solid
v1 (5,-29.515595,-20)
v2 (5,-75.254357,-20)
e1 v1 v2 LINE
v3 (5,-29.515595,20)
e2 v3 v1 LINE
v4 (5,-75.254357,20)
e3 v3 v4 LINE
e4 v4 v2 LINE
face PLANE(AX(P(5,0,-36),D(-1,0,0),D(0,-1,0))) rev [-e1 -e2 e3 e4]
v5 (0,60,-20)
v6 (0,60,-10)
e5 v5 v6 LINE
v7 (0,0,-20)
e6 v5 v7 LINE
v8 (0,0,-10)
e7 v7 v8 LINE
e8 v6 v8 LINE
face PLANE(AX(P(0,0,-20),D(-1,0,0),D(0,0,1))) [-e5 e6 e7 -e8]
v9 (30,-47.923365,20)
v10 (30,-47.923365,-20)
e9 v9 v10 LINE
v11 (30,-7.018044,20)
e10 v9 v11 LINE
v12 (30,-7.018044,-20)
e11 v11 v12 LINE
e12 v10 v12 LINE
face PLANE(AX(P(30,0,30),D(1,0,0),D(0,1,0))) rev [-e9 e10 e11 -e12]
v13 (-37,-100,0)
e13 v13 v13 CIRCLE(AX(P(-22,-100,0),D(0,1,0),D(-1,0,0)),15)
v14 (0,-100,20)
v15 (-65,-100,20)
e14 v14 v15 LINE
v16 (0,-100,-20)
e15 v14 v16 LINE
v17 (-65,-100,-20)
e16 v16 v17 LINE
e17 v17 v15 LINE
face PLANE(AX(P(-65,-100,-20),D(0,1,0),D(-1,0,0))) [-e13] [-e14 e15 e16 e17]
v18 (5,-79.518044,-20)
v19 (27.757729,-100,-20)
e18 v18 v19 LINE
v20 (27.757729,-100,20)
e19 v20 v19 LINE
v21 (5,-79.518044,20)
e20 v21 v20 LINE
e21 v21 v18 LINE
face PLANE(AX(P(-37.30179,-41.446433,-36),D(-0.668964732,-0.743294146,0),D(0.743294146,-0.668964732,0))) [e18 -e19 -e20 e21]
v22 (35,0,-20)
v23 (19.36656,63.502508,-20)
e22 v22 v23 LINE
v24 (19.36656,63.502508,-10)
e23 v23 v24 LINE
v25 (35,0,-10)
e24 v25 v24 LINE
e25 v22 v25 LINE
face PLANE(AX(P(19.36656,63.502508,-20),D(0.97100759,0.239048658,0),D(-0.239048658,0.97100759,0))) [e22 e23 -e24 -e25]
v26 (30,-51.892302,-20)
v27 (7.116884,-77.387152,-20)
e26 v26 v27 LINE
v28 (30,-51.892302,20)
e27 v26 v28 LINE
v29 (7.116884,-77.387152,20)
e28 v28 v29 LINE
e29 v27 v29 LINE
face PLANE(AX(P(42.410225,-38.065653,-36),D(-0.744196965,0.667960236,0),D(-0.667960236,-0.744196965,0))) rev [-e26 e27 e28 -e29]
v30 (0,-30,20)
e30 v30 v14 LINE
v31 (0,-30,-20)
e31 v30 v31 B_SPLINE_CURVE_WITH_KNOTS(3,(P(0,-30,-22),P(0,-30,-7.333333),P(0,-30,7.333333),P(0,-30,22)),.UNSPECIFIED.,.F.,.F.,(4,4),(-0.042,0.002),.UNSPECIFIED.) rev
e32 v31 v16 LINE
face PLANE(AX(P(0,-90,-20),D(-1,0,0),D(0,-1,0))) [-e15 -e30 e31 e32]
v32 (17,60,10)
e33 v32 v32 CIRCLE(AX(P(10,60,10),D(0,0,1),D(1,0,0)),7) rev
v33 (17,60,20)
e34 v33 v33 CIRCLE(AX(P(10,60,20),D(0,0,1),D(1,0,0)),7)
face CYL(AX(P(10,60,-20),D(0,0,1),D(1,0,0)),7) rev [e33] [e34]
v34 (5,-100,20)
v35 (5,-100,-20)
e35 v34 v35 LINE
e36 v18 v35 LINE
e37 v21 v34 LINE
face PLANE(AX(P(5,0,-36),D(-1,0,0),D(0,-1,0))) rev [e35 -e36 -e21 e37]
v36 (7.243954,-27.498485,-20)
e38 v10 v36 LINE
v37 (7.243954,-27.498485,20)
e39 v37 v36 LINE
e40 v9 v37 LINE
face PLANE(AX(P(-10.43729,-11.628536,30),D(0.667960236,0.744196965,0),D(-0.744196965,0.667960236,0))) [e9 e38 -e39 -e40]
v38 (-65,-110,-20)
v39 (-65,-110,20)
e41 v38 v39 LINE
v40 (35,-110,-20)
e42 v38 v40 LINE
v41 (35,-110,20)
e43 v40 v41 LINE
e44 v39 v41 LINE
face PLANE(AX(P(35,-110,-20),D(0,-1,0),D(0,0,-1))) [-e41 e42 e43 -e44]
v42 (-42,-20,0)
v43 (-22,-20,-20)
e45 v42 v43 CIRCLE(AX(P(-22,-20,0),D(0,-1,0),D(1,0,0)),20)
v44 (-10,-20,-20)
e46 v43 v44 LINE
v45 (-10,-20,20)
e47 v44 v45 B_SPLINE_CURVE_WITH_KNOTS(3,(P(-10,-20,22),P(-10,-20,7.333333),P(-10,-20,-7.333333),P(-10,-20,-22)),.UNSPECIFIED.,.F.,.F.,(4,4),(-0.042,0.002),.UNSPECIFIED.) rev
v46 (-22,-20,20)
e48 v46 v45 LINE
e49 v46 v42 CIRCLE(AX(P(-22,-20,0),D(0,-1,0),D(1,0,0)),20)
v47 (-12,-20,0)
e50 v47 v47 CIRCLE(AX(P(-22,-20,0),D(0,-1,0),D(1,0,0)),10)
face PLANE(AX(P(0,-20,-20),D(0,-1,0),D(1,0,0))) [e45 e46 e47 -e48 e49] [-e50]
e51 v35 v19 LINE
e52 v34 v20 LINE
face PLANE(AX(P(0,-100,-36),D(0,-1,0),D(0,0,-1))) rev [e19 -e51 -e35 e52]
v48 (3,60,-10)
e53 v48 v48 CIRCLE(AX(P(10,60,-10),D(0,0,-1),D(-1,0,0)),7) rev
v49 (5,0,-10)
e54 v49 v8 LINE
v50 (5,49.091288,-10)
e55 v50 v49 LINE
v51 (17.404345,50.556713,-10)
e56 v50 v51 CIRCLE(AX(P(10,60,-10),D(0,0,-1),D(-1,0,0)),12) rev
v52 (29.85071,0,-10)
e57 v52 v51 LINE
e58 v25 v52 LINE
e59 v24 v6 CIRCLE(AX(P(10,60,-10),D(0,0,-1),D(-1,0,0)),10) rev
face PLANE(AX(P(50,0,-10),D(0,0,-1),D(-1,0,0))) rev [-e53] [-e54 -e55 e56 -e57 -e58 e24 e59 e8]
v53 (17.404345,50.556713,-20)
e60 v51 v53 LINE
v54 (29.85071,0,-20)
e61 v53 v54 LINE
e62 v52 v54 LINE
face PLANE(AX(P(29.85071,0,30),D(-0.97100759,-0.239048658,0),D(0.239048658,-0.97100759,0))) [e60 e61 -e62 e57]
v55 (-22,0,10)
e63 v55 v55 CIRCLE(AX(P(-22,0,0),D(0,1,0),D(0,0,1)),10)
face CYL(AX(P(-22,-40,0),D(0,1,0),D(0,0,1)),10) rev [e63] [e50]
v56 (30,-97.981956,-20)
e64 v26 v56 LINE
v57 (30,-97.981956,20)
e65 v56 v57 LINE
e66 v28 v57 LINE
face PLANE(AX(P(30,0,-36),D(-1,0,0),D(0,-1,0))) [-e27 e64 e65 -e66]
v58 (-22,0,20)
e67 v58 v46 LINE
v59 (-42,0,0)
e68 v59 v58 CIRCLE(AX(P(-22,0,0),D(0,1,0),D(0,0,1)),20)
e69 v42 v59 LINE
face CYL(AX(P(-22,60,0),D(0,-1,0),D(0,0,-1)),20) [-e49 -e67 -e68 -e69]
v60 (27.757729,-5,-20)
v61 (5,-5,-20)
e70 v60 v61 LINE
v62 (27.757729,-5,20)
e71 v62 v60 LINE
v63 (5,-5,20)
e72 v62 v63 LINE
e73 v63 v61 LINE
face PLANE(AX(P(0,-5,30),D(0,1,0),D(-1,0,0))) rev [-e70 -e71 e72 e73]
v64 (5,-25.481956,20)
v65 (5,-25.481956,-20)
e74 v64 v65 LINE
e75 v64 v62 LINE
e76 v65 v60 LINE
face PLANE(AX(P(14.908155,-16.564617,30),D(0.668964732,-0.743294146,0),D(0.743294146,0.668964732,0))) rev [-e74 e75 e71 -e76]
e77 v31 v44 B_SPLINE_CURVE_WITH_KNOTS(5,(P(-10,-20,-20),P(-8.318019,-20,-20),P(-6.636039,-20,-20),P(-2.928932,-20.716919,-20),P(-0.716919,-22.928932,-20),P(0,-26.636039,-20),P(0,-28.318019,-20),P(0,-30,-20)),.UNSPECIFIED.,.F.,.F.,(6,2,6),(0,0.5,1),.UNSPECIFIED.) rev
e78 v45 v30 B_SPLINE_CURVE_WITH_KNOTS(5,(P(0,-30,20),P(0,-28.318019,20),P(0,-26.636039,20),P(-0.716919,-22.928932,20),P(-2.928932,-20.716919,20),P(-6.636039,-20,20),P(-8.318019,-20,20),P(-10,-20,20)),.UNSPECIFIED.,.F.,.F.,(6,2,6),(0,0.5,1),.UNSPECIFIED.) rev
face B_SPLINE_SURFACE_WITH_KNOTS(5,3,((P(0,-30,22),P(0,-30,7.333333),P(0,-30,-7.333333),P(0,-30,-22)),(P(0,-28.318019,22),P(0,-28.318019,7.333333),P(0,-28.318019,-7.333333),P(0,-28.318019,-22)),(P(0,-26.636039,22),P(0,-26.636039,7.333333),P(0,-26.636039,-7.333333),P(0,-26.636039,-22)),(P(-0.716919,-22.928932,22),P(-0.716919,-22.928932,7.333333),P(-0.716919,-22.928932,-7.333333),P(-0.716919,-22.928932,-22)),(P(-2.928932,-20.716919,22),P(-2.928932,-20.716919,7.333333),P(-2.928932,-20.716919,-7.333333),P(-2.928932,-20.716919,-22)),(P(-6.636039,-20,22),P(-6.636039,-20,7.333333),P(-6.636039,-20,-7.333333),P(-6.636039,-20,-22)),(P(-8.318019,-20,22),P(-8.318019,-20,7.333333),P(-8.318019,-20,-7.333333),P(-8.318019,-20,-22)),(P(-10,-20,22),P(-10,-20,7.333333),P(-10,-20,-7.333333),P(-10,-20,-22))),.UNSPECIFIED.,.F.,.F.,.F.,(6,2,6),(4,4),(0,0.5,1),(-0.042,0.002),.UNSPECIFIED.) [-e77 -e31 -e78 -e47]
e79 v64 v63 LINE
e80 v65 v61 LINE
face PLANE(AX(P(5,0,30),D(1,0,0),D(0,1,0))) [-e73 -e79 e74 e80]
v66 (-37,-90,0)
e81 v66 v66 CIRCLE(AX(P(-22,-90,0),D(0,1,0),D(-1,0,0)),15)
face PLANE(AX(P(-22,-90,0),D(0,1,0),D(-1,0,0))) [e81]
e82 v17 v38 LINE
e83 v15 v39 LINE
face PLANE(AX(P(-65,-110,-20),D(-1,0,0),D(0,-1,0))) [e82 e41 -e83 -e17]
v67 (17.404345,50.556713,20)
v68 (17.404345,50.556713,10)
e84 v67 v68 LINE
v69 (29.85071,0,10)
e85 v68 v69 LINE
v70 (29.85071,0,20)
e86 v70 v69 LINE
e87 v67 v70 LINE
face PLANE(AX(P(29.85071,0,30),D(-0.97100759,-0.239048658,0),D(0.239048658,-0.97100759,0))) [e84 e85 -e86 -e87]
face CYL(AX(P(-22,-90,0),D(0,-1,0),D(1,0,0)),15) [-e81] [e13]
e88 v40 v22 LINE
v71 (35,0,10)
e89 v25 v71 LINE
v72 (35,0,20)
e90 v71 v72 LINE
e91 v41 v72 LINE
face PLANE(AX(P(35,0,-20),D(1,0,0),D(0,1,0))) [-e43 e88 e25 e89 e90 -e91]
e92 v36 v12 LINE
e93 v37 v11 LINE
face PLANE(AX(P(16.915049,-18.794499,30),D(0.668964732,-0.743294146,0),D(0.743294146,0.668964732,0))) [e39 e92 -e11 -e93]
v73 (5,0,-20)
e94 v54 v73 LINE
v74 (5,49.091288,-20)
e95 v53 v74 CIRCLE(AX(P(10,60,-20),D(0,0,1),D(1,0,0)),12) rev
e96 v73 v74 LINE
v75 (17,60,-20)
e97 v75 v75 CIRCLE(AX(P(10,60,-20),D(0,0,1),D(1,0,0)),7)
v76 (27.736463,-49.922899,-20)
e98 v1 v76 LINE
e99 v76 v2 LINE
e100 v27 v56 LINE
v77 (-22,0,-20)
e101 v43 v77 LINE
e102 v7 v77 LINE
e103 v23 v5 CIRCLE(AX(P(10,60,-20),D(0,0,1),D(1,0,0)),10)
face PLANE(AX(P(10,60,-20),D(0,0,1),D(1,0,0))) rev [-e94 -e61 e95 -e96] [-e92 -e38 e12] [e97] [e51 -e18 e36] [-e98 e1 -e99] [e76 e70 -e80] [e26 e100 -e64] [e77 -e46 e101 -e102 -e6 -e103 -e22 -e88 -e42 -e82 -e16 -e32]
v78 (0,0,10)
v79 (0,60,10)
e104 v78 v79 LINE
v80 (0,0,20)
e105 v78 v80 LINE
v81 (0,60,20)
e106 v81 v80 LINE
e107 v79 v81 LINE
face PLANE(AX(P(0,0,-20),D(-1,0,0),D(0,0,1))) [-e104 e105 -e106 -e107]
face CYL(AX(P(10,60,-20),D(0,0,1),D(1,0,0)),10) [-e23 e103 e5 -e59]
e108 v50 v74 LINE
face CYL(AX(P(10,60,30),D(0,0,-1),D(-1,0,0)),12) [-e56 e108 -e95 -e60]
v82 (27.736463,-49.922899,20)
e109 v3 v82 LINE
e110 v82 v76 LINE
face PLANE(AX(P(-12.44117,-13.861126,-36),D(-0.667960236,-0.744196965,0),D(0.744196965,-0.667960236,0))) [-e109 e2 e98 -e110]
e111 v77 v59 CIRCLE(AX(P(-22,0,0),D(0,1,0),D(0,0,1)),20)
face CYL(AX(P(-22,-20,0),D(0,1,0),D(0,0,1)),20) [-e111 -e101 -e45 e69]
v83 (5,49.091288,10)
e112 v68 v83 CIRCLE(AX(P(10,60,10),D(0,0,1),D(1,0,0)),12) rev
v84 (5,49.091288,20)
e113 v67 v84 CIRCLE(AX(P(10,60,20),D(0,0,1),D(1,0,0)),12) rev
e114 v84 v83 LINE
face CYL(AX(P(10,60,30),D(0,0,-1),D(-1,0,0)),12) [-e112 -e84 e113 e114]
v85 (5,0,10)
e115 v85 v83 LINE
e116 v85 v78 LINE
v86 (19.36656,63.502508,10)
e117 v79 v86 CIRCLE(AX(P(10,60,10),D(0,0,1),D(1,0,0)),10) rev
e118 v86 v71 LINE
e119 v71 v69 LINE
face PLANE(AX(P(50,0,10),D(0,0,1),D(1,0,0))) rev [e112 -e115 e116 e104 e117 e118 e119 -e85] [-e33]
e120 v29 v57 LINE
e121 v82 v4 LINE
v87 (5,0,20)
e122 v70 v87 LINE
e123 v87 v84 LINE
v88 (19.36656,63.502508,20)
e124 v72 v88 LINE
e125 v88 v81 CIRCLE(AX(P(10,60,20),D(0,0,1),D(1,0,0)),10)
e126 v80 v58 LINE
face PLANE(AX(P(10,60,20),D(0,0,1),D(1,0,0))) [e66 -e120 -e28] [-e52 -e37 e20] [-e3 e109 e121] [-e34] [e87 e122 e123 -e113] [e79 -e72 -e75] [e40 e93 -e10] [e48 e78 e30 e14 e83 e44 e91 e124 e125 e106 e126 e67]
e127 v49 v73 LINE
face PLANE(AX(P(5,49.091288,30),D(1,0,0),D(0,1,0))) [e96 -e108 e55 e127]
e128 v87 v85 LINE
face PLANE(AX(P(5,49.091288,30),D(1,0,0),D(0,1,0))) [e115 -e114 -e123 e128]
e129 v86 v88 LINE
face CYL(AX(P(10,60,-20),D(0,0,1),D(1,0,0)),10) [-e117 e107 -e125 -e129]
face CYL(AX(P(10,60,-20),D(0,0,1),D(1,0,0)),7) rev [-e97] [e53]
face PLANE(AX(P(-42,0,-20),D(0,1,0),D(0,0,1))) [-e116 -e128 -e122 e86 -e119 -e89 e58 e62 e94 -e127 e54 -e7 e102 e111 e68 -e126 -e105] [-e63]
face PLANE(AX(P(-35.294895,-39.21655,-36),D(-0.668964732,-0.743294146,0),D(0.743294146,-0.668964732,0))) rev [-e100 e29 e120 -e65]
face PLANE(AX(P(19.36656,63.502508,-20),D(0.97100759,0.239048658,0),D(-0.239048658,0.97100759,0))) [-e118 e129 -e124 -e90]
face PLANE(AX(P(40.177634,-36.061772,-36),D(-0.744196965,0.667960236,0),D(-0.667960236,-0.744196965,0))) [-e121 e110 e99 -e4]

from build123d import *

# Parameters (mm, degrees)
BOSS_EXTRUDE1_DEPTH      = 20
BOSS_EXTRUDE1_DEPTH_BACK = 20
SKETCH1_R                = 7
SKETCH2_W                = 100
SKETCH2_H                = 10
BOSS_EXTRUDE2_DEPTH      = 40
FILLET1_R                = 20
SKETCH3_R                = 10
CUT_EXTRUDE1_DEPTH       = 40
FILLET2_SIZE             = 10
SKETCH4_W                = 20
SKETCH4_H                = 70
CUT_EXTRUDE2_DEPTH       = 50
SKETCH5_R                = 15
BOSS_EXTRUDE3_DEPTH      = 10
CUT_EXTRUDE4_DEPTH       = 10
CUT_EXTRUDE4_DEPTH_BACK  = 56


# Some blends are built 0.0001 mm under size
with BuildPart() as part:
    # Sketch1 → Boss-Extrude1 (new, two sides: drawn at the far end of the back side and taken through both)
    with BuildSketch(Plane.XY.offset(-BOSS_EXTRUDE1_DEPTH_BACK)):
        with BuildLine():
            Line((0, 0), (0, 60))
            ThreePointArc((0, 60), (8.220336618, 69.840365758), (19.36655965, 63.502507721))
            Line((19.36655965, 63.502507721), (35, 0))
            Line((35, 0), (35, -110))
            Line((35, -110), (0, -110))
            Line((0, -110), (0, -90))
            Line((0, -90), (0, -20))
            Line((0, -20), (-42, -20))
            Line((-42, -20), (-42, 0))
            Line((-42, 0), (0, 0))
        make_face()
        with Locations((10, 60)):
            Circle(SKETCH1_R, mode=Mode.SUBTRACT)
    extrude(amount=BOSS_EXTRUDE1_DEPTH + BOSS_EXTRUDE1_DEPTH_BACK)

    # Sketch2 → Boss-Extrude2 (add)
    with BuildSketch(Plane.XY.offset(20)):
        with Locations((-15, -105)):
            Rectangle(SKETCH2_W, SKETCH2_H)
    extrude(amount=-BOSS_EXTRUDE2_DEPTH)

    # Fillet1
    fillet1_edges = [part.edges().sort_by_distance(p)[0] for p in [
        (-42, -10, 20),
        (-42, -10, -20),
    ]]
    fillet(fillet1_edges, radius=FILLET1_R - 0.0001)  # a hair under: the kernel refuses the full size

    # Sketch3 → Cut-Extrude1 (cut)
    with BuildSketch(Plane(origin=(0, 0, 0), x_dir=(1, 0, 0), z_dir=(0, 1, 0))):
        with Locations(Location((-22, 0, 0), (0, 0, 270))):
            Circle(SKETCH3_R)
    extrude(amount=-CUT_EXTRUDE1_DEPTH, mode=Mode.SUBTRACT)

    # Fillet2
    # a fillet whose section is not a circle: 10 mm, written as the material it adds along each edge
    with BuildSketch(Plane(origin=(0, -20, 20), x_dir=(-1, 0, 0), z_dir=(0, 0, -1))) as fillet2_piece_1:
        with BuildLine():
            add(Edge.make_bspline([(FILLET2_SIZE, 0), (FILLET2_SIZE * 0.831801948466, 0), (FILLET2_SIZE * 0.663603896932, 0), (FILLET2_SIZE * 0.292893218813, -FILLET2_SIZE * 0.0716919198361), (FILLET2_SIZE * 0.0716919198361, -FILLET2_SIZE * 0.292893218813), (0, -FILLET2_SIZE * 0.663603896932), (0, -FILLET2_SIZE * 0.831801948466), (0, -FILLET2_SIZE)], knots=[0, 0, 0, 0, 0, 0, 0.5, 0.5, 1, 1, 1, 1, 1, 1], degree=5))
            Line((0, -FILLET2_SIZE), (-FILLET2_SIZE * 0.02, -FILLET2_SIZE))
            Line((-FILLET2_SIZE * 0.02, -FILLET2_SIZE), (-FILLET2_SIZE * 0.02, FILLET2_SIZE * 0.02))
            Line((-FILLET2_SIZE * 0.02, FILLET2_SIZE * 0.02), (FILLET2_SIZE, FILLET2_SIZE * 0.02))
            Line((FILLET2_SIZE, FILLET2_SIZE * 0.02), (FILLET2_SIZE, 0))
        make_face()
    extrude(amount=40)

    # Sketch4 → Cut-Extrude2 (cut)
    with BuildSketch(Plane.ZY):
        with Locations((0, 35)):
            Rectangle(SKETCH4_W, SKETCH4_H)
    extrude(amount=-CUT_EXTRUDE2_DEPTH, mode=Mode.SUBTRACT)

    # Sketch5 → Boss-Extrude3 (add)
    with BuildSketch(Plane(origin=(0, -100, 0), x_dir=(1, 0, 0), z_dir=(0, 1, 0))):
        with Locations(Location((-22, 0, 0), (0, 0, 180))):
            Circle(SKETCH5_R)
    extrude(amount=BOSS_EXTRUDE3_DEPTH)

    # Sketch6 → Cut-Extrude4 (cut, two sides: drawn at the far end of the back side and taken through both)
    with BuildSketch(Plane.XY.offset(20).offset(-CUT_EXTRUDE4_DEPTH_BACK)):
        Polygon((30, -47.923364513), (30, -7.018043607), (7.243954377, -27.498484668), align=None)
        Polygon((27.757729325, -5), (5, -5), (5, -25.481956393), align=None)
        Polygon((27.736463224, -49.922898925), (5, -29.515595427), (5, -30), (5, -75.254357341), align=None)
        Polygon((30, -97.981956393), (30, -51.892301788), (7.116883504, -77.387151546), align=None)
        Polygon((27.757729325, -100), (5, -79.518043607), (5, -100), align=None)
        with BuildLine():
            Line((29.850709662, 0), (17.404345208, 50.556712859))
            ThreePointArc((17.404345208, 50.556712859), (11.407865959, 48.082873105), (5, 49.091287885))
            Line((5, 49.091287885), (5, 0))
            Line((5, 0), (29.850709662, 0))
        make_face()
    extrude(amount=CUT_EXTRUDE4_DEPTH + CUT_EXTRUDE4_DEPTH_BACK, mode=Mode.SUBTRACT)


solid = part.part
